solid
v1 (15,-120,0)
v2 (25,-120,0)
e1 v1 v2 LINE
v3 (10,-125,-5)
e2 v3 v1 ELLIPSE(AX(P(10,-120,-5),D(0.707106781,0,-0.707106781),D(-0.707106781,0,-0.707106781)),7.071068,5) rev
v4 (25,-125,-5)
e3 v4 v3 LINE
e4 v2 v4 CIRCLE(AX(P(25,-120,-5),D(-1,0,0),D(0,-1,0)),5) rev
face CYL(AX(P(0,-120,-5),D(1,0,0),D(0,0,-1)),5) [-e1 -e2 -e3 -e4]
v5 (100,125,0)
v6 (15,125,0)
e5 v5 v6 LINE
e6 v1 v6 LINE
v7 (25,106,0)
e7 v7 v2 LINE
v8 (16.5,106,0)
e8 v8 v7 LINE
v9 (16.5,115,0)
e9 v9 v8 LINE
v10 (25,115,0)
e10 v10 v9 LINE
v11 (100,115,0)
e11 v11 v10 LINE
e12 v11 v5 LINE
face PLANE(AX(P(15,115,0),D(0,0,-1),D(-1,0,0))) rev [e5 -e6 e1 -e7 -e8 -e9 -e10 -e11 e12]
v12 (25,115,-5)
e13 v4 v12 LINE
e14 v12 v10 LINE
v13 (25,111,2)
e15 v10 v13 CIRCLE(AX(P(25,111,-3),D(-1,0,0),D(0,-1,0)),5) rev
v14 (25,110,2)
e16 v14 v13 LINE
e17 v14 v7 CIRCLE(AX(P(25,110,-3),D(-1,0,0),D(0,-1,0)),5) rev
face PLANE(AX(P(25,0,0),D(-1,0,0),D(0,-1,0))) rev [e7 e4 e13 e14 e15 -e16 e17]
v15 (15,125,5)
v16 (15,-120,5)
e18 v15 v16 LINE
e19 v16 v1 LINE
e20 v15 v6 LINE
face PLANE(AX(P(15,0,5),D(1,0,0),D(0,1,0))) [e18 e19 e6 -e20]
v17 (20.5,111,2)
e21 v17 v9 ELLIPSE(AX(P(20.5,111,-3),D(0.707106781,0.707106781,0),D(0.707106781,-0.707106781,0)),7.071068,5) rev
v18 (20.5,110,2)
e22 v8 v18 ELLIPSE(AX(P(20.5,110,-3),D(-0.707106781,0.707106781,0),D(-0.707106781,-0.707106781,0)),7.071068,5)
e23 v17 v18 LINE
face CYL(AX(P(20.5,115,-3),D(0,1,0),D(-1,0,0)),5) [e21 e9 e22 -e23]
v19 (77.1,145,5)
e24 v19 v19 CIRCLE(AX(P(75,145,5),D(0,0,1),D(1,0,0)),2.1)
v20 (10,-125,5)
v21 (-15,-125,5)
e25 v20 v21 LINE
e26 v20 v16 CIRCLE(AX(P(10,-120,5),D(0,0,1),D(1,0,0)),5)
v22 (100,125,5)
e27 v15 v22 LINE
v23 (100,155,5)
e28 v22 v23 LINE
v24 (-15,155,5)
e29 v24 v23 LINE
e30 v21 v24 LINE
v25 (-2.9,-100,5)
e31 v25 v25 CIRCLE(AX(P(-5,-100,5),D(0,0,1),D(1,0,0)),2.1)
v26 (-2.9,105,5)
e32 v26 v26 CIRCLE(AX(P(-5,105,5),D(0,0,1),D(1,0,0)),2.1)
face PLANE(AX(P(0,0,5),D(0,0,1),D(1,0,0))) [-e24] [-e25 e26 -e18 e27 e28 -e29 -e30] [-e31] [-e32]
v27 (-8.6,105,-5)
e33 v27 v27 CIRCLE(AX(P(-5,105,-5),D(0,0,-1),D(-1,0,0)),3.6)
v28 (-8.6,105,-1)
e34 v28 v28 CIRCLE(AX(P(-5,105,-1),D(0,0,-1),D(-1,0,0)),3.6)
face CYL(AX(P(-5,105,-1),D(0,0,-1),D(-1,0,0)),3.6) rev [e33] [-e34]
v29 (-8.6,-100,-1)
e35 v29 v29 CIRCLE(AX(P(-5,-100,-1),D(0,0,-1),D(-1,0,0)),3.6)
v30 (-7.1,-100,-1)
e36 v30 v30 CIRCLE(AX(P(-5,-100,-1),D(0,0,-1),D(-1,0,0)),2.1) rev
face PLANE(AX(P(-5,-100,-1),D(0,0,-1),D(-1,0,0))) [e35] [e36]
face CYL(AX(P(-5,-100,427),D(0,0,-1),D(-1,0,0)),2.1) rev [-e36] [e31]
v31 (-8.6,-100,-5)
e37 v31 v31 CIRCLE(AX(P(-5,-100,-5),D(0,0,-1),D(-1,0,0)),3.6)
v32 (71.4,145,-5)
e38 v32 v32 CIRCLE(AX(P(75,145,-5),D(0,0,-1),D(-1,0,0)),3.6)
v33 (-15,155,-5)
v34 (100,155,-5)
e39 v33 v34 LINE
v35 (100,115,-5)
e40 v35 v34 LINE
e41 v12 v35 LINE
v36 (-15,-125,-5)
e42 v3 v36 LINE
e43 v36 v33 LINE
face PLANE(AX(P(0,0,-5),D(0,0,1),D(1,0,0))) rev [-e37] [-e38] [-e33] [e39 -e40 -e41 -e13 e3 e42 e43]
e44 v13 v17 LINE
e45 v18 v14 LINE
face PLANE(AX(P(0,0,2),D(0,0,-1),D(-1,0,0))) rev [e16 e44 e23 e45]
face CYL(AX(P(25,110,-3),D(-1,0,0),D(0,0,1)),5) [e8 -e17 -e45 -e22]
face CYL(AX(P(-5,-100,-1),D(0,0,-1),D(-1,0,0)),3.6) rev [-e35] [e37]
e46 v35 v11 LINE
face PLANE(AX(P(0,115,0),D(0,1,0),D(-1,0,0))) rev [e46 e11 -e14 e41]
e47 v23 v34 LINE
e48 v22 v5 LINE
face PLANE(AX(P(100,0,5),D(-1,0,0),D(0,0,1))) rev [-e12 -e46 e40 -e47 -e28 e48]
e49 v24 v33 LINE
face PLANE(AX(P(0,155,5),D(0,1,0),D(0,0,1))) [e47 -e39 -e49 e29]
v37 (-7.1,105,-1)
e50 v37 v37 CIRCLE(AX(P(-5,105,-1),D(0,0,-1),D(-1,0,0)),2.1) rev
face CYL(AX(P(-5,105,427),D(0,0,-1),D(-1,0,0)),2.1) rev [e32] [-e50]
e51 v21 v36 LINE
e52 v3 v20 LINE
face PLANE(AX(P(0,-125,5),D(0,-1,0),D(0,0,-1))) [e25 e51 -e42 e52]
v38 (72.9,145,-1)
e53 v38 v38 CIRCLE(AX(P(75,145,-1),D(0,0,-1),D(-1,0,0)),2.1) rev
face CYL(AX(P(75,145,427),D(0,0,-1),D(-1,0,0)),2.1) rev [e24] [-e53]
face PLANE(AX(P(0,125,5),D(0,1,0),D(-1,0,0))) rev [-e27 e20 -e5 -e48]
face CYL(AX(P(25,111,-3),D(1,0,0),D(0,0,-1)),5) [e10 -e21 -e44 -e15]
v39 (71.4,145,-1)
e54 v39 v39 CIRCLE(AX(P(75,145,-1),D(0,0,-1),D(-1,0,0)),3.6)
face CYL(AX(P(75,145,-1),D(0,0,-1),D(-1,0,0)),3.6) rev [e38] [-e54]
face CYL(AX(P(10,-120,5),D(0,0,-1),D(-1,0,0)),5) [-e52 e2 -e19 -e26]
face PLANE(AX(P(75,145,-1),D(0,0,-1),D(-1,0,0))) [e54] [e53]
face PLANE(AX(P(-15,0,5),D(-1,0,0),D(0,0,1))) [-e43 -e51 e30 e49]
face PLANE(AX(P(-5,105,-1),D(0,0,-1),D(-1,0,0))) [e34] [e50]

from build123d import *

# Parameters (mm, degrees)
SKETCH4_W           = 30
SKETCH4_H           = 250
BOSS_EXTRUDE3_DEPTH = 5
SKETCH5_W           = 85
SKETCH5_H           = 5
BOSS_EXTRUDE4_DEPTH = 10
SKETCH6_W           = 5
SKETCH6_H           = 240
BOSS_EXTRUDE5_DEPTH = 10
SKETCH7_W           = 8.5
SKETCH7_H           = 9
BOSS_EXTRUDE6_DEPTH = 2
FILLET2_R           = 5
FILLET3_R           = 5
SKETCH8_R           = 2.1
CUT_EXTRUDE1_DEPTH  = 432
SKETCH9_R           = 3.6
CUT_EXTRUDE2_DEPTH  = 4


# Some blends are built 0.0001 mm under size
with BuildPart() as part:
    # Sketch4 → Boss-Extrude3 (new, symmetric)
    with BuildSketch(Plane.XY):
        Polygon((-15, 125), (15, 125), (100, 125), (100, 155), (-15, 155), align=None)
        Rectangle(SKETCH4_W, SKETCH4_H)
    extrude(amount=BOSS_EXTRUDE3_DEPTH, both=True)

    # Sketch5 → Boss-Extrude4 (add)
    with BuildSketch(Plane(origin=(15, 125, -5), x_dir=(1, 0, 0), z_dir=(0, -1, 0))):
        with Locations((42.5, 2.5)):
            Rectangle(SKETCH5_W, SKETCH5_H)
    extrude(amount=BOSS_EXTRUDE4_DEPTH)

    # Sketch6 → Boss-Extrude5 (add)
    with BuildSketch(Plane(origin=(15, 0, 0), x_dir=(0, 0, -1), z_dir=(1, 0, 0))):
        with Locations((2.5, -5)):
            Rectangle(SKETCH6_W, SKETCH6_H)
    extrude(amount=BOSS_EXTRUDE5_DEPTH)

    # Sketch7 → Boss-Extrude6 (add)
    with BuildSketch(Plane.XY):
        with Locations((20.75, 110.5)):
            Rectangle(SKETCH7_W, SKETCH7_H)
    extrude(amount=BOSS_EXTRUDE6_DEPTH)

    # Fillet2
    # the kernel refuses this fillet: 5 mm, written as the material it takes off along each edge
    with BuildSketch(Plane(origin=(16.5, 125, 2), x_dir=(0, 0, -1), z_dir=(0, -1, 0))) as fillet2_piece_1:
        with BuildLine():
            CenterArc((5, 4), FILLET2_R, 180, 53.130102354)
            Line((0, 4), (0, 0))
            Line((0, 0), (2, 0))
        make_face()
    extrude(amount=29, mode=Mode.SUBTRACT)
    with BuildSketch(Plane(origin=(35, 115, 2), x_dir=(0, 0, -1), z_dir=(-1, 0, 0)), Plane(origin=(16.5, 106, 2), x_dir=(0, 0, -1), z_dir=(1, 0, 0))) as fillet2_piece_2:
        with BuildLine():
            CenterArc((5, 4), FILLET2_R, 180, 53.130102354)
            Line((0, 4), (0, 0))
            Line((0, 0), (2, 0))
        make_face()
    extrude(amount=18.5, mode=Mode.SUBTRACT)

    # Fillet3
    fillet3_edges = [part.edges().sort_by_distance(p)[0] for p in [
        (15, -125, 2.5),
        (20, -125, 0),
    ]]
    fillet(fillet3_edges, radius=FILLET3_R - 0.0001)  # a hair under: the kernel refuses the full size

    # Sketch8 → Cut-Extrude1 (cut)
    with BuildSketch(Plane(origin=(0, 0, -5), x_dir=(-1, 0, 0), z_dir=(0, 0, -1))):
        with Locations((5, -100)):
            Circle(SKETCH8_R)
        with Locations((5, 105)):
            Circle(SKETCH8_R)
        with Locations((-75, 145)):
            Circle(SKETCH8_R)
    extrude(amount=-CUT_EXTRUDE1_DEPTH, mode=Mode.SUBTRACT)

    # Sketch9 → Cut-Extrude2 (cut)
    with BuildSketch(Plane(origin=(0, 0, -5), x_dir=(-1, 0, 0), z_dir=(0, 0, -1))):
        with Locations((-75, 145)):
            Circle(SKETCH9_R)
        with Locations((5, 105)):
            Circle(SKETCH9_R)
        with Locations((5, -100)):
            Circle(SKETCH9_R)
    extrude(amount=-CUT_EXTRUDE2_DEPTH, mode=Mode.SUBTRACT)


solid = part.part
